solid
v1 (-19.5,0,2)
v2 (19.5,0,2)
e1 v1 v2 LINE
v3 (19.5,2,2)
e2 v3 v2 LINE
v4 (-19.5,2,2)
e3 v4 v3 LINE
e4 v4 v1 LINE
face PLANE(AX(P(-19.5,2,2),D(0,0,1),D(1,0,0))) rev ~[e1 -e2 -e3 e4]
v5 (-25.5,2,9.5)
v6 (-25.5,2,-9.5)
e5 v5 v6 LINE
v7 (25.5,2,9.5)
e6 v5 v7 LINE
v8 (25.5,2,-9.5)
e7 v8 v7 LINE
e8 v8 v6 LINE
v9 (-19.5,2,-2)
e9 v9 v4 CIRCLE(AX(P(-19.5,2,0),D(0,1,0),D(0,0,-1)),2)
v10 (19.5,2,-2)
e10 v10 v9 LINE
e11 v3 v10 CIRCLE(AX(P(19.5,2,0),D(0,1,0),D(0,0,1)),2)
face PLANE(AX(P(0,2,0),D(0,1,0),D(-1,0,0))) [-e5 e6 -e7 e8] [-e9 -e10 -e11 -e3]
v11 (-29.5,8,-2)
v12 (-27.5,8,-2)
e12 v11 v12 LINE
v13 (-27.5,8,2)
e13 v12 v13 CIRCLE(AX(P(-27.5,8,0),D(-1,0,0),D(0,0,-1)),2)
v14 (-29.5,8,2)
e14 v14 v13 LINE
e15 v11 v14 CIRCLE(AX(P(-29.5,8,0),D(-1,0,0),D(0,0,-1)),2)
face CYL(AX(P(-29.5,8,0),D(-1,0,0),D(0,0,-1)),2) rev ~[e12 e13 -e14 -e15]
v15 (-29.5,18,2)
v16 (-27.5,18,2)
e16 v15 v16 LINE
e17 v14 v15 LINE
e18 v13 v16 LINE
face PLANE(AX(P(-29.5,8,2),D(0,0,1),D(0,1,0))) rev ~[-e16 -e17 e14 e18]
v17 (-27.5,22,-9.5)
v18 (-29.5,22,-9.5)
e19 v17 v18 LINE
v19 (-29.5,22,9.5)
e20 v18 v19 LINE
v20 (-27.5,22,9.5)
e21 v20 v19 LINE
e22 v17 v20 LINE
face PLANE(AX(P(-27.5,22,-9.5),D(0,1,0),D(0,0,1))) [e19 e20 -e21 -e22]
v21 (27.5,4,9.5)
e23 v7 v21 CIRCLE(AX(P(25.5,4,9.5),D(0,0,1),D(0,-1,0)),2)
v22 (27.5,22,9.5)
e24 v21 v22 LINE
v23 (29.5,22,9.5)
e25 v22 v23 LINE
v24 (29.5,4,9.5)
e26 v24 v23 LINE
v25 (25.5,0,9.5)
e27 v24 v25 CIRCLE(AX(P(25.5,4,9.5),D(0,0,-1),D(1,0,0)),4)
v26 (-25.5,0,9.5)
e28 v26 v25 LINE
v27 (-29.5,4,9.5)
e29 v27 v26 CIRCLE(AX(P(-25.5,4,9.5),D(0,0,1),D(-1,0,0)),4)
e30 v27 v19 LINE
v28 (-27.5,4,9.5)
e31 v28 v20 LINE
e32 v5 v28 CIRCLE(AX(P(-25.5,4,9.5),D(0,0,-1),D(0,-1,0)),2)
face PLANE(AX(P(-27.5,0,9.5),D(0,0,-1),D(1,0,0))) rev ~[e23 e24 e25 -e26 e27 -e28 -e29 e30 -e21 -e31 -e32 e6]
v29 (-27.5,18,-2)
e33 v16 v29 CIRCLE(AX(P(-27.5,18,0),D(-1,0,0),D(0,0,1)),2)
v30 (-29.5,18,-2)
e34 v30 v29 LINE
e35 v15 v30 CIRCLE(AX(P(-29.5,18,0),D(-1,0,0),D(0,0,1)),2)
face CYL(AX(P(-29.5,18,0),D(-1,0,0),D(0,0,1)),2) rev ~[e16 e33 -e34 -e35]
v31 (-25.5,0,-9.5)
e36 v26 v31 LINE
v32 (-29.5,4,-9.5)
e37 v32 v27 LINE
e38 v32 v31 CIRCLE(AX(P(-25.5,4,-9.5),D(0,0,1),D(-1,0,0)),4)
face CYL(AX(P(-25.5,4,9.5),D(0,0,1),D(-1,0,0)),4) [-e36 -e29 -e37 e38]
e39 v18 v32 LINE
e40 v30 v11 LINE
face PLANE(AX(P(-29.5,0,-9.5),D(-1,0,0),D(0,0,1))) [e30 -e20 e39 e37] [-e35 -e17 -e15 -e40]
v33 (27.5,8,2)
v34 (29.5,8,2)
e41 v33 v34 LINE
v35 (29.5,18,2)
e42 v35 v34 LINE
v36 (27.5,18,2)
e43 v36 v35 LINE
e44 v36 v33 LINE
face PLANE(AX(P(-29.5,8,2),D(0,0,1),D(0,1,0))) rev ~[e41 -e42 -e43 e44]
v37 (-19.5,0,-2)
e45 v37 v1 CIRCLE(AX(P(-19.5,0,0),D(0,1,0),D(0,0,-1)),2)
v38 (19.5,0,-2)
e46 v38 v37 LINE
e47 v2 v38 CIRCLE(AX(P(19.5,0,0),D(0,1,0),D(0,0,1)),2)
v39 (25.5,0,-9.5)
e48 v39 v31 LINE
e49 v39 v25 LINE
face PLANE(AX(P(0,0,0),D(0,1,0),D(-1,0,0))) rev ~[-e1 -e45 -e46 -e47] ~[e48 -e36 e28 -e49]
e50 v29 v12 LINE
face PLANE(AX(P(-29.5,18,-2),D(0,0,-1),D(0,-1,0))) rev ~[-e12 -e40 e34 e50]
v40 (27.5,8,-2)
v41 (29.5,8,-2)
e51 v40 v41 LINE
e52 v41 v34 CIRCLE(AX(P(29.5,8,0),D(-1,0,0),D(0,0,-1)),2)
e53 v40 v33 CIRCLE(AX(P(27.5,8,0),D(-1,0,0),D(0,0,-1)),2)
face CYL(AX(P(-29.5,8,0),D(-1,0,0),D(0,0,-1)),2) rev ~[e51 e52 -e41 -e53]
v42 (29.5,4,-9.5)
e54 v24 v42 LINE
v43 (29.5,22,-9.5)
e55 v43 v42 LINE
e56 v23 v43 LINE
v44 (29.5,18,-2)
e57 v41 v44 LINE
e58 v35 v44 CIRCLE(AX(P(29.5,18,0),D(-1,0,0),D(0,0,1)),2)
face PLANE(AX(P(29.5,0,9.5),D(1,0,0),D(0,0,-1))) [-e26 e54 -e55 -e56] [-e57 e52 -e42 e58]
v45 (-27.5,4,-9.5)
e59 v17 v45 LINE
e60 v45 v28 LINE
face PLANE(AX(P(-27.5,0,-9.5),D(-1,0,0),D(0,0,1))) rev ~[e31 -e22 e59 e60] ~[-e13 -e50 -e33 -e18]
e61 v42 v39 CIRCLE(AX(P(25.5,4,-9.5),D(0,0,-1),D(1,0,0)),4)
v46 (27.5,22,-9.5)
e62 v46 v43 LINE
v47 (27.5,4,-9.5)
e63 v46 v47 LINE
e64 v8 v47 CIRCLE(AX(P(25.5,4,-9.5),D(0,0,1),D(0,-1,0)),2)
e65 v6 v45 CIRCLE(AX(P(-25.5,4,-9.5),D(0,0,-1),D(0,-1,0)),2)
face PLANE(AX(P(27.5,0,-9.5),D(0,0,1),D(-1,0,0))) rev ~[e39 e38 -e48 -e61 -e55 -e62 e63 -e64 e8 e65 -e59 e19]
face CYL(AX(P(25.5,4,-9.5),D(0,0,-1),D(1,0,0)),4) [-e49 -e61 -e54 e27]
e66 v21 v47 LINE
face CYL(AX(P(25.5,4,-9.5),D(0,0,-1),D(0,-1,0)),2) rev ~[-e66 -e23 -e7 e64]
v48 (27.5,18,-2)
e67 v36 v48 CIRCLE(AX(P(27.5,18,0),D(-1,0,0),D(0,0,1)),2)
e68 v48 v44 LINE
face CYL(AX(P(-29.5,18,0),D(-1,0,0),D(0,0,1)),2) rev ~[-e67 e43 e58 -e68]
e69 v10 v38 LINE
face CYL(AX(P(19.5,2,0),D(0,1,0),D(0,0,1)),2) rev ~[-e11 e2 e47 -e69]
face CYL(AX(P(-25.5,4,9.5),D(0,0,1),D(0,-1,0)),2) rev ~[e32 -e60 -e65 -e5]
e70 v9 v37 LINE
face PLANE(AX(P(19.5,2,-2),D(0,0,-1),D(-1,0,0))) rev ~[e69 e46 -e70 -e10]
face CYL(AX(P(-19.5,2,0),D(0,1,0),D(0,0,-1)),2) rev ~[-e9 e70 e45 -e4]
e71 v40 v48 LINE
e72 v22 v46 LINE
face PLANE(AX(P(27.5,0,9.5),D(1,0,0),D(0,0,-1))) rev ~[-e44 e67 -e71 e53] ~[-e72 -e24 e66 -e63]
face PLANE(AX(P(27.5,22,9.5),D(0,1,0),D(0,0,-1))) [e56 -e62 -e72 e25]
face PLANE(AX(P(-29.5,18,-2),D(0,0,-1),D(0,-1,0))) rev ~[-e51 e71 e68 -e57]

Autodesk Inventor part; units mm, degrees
ref_plane "YZ Plane" through (0, 0, 0) normal (1, 0, 0) x (0, 1, 0)
ref_plane "XZ Plane" through (0, 0, 0) normal (0, 1, 0) x (-1, 0, 0)
ref_plane "XY Plane" through (0, 0, 0) normal (0, 0, 1) x (1, 0, 0)
sketch "スケッチ1" plane through (0, 0, 0) normal (0, 1, 0) x (-1, 0, 0)
  line L0 (-27.5, -9.5) -> (27.5, -9.5)
  line L1 (27.5, -9.5) -> (27.5, 9.5)
  line L2 (27.5, 9.5) -> (-27.5, 9.5)
  line L3 (-27.5, 9.5) -> (-27.5, -9.5)
  line L4 (-27.5, -9.5) -> (27.5, 9.5) construction
  line L5 (27.5, -9.5) -> (-27.5, 9.5) construction
  point P0 (0, 0)
  dimension "d0" = 19
  dimension "d1" = 55
extrude "プレート1" add sketch "スケッチ1" along normal blind 2
sketch "スケッチ2" plane through (27.5, 0, 9.5) normal (1, 0, 0) x (0, 0, -1)
  line L0 (0, 2) -> (19, 2)
  line L1 (19, 2) -> (0, 2)
  line L2 (0, 2) -> (0, 22)
  line L3 (0, 22) -> (19, 22)
  line L4 (19, 22) -> (19, 2)
  point P0 (9.5, 0)
  dimension "d3" = 20
sheet face with bend "面2" sketch "スケッチ2" thickness 2 toward (1, 0, 0) bend radius 2
bend "曲げ1"
sketch "スケッチ3" plane through (-27.5, 0, -9.5) normal (-1, 0, 0) x (0, 0, 1)
  line L0 (0, 0) -> (0, 2)
  line L1 (0, 22) -> (19, 22)
  line L2 (0, 2) -> (19, 2)
  line L3 (19, 2) -> (19, 22)
  line L4 (19, 22) -> (0, 22)
  line L5 (0, 22) -> (0, 2)
  point P0 (9.5, 0)
sheet face with bend "面3" sketch "スケッチ3" thickness 2 toward (-1, 0, 0) bend radius 2
bend "曲げ2"
sketch "スケッチ4" plane through (-29.5, 0, -9.5) normal (-1, 0, 0) x (0, 0, 1)
  line L0 (7.5, 18) -> (7.5, 8)
  arc A0 (7.5, 8) -> (11.5, 8) centre (9.5, 8) ccw
  line L1 (11.5, 8) -> (11.5, 18)
  arc A1 (11.5, 18) -> (7.5, 18) centre (9.5, 18) ccw
  line L2 (19, 22) -> (19, 4) projected
  line L3 (0, 22) -> (19, 22) projected
  line L4 (19, 4) -> (0, 4) projected
  point P0 (9.5, 0)
  dimension "d18" = 2
  dimension "d33" = 4
  dimension "d34" = 4
extrude "押し出し1" cut sketch "スケッチ4" against normal blind 100
sketch "スケッチ5" plane through (0, 2, 0) normal (0, 1, 0) x (1, 0, 0)
  line L0 (-19.5, -2) -> (19.5, -2)
  arc A0 (19.5, -2) -> (19.5, 2) centre (19.5, 0) ccw
  line L1 (19.5, 2) -> (-19.5, 2)
  arc A1 (-19.5, 2) -> (-19.5, -2) centre (-19.5, 0) ccw
  line L2 (25.5, -9.5) -> (-25.5, -9.5) projected
  line L3 (-25.5, 9.5) -> (-25.5, -9.5) projected
  line L4 (25.5, -9.5) -> (25.5, 9.5) projected
  point P0 (0, 0)
  point P1 (-21.5, 0)
  dimension "d22" = 2
  dimension "d35" = 6
  dimension "d36" = 6
extrude "押し出し2" cut sketch "スケッチ5" against normal blind 3
equation "\"d2\" = Thickness"
equation "\"d4\" = BendRadius"
equation "\"d5\" = BendReliefWidth"
equation "\"d7\" = MinimumRemnant"
equation "\"d6\" = BendReliefDepth"
equation "\"d8\" = TransitionRadius"
equation "\"d9\" = BendRadius"
equation "\"d10\" = BendReliefWidth"
equation "\"d12\" = MinimumRemnant"
equation "\"d11\" = BendReliefDepth"
equation "\"d13\" = TransitionRadius"
equation "\"BendRadius\" = Thickness"
equation "\"BendReliefWidth\" = Thickness"
equation "\"BendReliefDepth\" = 0.5 * Thickness"
equation "\"CornerReliefSize\" = 4 * Thickness"
equation "\"MinimumRemnant\" = 2 * Thickness"
equation "\"TransitionRadius\" = BendRadius"
equation "\"JacobiRadiusSize\" = BendRadius"
equation "\"GapSize\" = Thickness"
equation "\"Thickness\" = 2"
properties part number "thumbkey_cup" material "アルミニウム 6061"
